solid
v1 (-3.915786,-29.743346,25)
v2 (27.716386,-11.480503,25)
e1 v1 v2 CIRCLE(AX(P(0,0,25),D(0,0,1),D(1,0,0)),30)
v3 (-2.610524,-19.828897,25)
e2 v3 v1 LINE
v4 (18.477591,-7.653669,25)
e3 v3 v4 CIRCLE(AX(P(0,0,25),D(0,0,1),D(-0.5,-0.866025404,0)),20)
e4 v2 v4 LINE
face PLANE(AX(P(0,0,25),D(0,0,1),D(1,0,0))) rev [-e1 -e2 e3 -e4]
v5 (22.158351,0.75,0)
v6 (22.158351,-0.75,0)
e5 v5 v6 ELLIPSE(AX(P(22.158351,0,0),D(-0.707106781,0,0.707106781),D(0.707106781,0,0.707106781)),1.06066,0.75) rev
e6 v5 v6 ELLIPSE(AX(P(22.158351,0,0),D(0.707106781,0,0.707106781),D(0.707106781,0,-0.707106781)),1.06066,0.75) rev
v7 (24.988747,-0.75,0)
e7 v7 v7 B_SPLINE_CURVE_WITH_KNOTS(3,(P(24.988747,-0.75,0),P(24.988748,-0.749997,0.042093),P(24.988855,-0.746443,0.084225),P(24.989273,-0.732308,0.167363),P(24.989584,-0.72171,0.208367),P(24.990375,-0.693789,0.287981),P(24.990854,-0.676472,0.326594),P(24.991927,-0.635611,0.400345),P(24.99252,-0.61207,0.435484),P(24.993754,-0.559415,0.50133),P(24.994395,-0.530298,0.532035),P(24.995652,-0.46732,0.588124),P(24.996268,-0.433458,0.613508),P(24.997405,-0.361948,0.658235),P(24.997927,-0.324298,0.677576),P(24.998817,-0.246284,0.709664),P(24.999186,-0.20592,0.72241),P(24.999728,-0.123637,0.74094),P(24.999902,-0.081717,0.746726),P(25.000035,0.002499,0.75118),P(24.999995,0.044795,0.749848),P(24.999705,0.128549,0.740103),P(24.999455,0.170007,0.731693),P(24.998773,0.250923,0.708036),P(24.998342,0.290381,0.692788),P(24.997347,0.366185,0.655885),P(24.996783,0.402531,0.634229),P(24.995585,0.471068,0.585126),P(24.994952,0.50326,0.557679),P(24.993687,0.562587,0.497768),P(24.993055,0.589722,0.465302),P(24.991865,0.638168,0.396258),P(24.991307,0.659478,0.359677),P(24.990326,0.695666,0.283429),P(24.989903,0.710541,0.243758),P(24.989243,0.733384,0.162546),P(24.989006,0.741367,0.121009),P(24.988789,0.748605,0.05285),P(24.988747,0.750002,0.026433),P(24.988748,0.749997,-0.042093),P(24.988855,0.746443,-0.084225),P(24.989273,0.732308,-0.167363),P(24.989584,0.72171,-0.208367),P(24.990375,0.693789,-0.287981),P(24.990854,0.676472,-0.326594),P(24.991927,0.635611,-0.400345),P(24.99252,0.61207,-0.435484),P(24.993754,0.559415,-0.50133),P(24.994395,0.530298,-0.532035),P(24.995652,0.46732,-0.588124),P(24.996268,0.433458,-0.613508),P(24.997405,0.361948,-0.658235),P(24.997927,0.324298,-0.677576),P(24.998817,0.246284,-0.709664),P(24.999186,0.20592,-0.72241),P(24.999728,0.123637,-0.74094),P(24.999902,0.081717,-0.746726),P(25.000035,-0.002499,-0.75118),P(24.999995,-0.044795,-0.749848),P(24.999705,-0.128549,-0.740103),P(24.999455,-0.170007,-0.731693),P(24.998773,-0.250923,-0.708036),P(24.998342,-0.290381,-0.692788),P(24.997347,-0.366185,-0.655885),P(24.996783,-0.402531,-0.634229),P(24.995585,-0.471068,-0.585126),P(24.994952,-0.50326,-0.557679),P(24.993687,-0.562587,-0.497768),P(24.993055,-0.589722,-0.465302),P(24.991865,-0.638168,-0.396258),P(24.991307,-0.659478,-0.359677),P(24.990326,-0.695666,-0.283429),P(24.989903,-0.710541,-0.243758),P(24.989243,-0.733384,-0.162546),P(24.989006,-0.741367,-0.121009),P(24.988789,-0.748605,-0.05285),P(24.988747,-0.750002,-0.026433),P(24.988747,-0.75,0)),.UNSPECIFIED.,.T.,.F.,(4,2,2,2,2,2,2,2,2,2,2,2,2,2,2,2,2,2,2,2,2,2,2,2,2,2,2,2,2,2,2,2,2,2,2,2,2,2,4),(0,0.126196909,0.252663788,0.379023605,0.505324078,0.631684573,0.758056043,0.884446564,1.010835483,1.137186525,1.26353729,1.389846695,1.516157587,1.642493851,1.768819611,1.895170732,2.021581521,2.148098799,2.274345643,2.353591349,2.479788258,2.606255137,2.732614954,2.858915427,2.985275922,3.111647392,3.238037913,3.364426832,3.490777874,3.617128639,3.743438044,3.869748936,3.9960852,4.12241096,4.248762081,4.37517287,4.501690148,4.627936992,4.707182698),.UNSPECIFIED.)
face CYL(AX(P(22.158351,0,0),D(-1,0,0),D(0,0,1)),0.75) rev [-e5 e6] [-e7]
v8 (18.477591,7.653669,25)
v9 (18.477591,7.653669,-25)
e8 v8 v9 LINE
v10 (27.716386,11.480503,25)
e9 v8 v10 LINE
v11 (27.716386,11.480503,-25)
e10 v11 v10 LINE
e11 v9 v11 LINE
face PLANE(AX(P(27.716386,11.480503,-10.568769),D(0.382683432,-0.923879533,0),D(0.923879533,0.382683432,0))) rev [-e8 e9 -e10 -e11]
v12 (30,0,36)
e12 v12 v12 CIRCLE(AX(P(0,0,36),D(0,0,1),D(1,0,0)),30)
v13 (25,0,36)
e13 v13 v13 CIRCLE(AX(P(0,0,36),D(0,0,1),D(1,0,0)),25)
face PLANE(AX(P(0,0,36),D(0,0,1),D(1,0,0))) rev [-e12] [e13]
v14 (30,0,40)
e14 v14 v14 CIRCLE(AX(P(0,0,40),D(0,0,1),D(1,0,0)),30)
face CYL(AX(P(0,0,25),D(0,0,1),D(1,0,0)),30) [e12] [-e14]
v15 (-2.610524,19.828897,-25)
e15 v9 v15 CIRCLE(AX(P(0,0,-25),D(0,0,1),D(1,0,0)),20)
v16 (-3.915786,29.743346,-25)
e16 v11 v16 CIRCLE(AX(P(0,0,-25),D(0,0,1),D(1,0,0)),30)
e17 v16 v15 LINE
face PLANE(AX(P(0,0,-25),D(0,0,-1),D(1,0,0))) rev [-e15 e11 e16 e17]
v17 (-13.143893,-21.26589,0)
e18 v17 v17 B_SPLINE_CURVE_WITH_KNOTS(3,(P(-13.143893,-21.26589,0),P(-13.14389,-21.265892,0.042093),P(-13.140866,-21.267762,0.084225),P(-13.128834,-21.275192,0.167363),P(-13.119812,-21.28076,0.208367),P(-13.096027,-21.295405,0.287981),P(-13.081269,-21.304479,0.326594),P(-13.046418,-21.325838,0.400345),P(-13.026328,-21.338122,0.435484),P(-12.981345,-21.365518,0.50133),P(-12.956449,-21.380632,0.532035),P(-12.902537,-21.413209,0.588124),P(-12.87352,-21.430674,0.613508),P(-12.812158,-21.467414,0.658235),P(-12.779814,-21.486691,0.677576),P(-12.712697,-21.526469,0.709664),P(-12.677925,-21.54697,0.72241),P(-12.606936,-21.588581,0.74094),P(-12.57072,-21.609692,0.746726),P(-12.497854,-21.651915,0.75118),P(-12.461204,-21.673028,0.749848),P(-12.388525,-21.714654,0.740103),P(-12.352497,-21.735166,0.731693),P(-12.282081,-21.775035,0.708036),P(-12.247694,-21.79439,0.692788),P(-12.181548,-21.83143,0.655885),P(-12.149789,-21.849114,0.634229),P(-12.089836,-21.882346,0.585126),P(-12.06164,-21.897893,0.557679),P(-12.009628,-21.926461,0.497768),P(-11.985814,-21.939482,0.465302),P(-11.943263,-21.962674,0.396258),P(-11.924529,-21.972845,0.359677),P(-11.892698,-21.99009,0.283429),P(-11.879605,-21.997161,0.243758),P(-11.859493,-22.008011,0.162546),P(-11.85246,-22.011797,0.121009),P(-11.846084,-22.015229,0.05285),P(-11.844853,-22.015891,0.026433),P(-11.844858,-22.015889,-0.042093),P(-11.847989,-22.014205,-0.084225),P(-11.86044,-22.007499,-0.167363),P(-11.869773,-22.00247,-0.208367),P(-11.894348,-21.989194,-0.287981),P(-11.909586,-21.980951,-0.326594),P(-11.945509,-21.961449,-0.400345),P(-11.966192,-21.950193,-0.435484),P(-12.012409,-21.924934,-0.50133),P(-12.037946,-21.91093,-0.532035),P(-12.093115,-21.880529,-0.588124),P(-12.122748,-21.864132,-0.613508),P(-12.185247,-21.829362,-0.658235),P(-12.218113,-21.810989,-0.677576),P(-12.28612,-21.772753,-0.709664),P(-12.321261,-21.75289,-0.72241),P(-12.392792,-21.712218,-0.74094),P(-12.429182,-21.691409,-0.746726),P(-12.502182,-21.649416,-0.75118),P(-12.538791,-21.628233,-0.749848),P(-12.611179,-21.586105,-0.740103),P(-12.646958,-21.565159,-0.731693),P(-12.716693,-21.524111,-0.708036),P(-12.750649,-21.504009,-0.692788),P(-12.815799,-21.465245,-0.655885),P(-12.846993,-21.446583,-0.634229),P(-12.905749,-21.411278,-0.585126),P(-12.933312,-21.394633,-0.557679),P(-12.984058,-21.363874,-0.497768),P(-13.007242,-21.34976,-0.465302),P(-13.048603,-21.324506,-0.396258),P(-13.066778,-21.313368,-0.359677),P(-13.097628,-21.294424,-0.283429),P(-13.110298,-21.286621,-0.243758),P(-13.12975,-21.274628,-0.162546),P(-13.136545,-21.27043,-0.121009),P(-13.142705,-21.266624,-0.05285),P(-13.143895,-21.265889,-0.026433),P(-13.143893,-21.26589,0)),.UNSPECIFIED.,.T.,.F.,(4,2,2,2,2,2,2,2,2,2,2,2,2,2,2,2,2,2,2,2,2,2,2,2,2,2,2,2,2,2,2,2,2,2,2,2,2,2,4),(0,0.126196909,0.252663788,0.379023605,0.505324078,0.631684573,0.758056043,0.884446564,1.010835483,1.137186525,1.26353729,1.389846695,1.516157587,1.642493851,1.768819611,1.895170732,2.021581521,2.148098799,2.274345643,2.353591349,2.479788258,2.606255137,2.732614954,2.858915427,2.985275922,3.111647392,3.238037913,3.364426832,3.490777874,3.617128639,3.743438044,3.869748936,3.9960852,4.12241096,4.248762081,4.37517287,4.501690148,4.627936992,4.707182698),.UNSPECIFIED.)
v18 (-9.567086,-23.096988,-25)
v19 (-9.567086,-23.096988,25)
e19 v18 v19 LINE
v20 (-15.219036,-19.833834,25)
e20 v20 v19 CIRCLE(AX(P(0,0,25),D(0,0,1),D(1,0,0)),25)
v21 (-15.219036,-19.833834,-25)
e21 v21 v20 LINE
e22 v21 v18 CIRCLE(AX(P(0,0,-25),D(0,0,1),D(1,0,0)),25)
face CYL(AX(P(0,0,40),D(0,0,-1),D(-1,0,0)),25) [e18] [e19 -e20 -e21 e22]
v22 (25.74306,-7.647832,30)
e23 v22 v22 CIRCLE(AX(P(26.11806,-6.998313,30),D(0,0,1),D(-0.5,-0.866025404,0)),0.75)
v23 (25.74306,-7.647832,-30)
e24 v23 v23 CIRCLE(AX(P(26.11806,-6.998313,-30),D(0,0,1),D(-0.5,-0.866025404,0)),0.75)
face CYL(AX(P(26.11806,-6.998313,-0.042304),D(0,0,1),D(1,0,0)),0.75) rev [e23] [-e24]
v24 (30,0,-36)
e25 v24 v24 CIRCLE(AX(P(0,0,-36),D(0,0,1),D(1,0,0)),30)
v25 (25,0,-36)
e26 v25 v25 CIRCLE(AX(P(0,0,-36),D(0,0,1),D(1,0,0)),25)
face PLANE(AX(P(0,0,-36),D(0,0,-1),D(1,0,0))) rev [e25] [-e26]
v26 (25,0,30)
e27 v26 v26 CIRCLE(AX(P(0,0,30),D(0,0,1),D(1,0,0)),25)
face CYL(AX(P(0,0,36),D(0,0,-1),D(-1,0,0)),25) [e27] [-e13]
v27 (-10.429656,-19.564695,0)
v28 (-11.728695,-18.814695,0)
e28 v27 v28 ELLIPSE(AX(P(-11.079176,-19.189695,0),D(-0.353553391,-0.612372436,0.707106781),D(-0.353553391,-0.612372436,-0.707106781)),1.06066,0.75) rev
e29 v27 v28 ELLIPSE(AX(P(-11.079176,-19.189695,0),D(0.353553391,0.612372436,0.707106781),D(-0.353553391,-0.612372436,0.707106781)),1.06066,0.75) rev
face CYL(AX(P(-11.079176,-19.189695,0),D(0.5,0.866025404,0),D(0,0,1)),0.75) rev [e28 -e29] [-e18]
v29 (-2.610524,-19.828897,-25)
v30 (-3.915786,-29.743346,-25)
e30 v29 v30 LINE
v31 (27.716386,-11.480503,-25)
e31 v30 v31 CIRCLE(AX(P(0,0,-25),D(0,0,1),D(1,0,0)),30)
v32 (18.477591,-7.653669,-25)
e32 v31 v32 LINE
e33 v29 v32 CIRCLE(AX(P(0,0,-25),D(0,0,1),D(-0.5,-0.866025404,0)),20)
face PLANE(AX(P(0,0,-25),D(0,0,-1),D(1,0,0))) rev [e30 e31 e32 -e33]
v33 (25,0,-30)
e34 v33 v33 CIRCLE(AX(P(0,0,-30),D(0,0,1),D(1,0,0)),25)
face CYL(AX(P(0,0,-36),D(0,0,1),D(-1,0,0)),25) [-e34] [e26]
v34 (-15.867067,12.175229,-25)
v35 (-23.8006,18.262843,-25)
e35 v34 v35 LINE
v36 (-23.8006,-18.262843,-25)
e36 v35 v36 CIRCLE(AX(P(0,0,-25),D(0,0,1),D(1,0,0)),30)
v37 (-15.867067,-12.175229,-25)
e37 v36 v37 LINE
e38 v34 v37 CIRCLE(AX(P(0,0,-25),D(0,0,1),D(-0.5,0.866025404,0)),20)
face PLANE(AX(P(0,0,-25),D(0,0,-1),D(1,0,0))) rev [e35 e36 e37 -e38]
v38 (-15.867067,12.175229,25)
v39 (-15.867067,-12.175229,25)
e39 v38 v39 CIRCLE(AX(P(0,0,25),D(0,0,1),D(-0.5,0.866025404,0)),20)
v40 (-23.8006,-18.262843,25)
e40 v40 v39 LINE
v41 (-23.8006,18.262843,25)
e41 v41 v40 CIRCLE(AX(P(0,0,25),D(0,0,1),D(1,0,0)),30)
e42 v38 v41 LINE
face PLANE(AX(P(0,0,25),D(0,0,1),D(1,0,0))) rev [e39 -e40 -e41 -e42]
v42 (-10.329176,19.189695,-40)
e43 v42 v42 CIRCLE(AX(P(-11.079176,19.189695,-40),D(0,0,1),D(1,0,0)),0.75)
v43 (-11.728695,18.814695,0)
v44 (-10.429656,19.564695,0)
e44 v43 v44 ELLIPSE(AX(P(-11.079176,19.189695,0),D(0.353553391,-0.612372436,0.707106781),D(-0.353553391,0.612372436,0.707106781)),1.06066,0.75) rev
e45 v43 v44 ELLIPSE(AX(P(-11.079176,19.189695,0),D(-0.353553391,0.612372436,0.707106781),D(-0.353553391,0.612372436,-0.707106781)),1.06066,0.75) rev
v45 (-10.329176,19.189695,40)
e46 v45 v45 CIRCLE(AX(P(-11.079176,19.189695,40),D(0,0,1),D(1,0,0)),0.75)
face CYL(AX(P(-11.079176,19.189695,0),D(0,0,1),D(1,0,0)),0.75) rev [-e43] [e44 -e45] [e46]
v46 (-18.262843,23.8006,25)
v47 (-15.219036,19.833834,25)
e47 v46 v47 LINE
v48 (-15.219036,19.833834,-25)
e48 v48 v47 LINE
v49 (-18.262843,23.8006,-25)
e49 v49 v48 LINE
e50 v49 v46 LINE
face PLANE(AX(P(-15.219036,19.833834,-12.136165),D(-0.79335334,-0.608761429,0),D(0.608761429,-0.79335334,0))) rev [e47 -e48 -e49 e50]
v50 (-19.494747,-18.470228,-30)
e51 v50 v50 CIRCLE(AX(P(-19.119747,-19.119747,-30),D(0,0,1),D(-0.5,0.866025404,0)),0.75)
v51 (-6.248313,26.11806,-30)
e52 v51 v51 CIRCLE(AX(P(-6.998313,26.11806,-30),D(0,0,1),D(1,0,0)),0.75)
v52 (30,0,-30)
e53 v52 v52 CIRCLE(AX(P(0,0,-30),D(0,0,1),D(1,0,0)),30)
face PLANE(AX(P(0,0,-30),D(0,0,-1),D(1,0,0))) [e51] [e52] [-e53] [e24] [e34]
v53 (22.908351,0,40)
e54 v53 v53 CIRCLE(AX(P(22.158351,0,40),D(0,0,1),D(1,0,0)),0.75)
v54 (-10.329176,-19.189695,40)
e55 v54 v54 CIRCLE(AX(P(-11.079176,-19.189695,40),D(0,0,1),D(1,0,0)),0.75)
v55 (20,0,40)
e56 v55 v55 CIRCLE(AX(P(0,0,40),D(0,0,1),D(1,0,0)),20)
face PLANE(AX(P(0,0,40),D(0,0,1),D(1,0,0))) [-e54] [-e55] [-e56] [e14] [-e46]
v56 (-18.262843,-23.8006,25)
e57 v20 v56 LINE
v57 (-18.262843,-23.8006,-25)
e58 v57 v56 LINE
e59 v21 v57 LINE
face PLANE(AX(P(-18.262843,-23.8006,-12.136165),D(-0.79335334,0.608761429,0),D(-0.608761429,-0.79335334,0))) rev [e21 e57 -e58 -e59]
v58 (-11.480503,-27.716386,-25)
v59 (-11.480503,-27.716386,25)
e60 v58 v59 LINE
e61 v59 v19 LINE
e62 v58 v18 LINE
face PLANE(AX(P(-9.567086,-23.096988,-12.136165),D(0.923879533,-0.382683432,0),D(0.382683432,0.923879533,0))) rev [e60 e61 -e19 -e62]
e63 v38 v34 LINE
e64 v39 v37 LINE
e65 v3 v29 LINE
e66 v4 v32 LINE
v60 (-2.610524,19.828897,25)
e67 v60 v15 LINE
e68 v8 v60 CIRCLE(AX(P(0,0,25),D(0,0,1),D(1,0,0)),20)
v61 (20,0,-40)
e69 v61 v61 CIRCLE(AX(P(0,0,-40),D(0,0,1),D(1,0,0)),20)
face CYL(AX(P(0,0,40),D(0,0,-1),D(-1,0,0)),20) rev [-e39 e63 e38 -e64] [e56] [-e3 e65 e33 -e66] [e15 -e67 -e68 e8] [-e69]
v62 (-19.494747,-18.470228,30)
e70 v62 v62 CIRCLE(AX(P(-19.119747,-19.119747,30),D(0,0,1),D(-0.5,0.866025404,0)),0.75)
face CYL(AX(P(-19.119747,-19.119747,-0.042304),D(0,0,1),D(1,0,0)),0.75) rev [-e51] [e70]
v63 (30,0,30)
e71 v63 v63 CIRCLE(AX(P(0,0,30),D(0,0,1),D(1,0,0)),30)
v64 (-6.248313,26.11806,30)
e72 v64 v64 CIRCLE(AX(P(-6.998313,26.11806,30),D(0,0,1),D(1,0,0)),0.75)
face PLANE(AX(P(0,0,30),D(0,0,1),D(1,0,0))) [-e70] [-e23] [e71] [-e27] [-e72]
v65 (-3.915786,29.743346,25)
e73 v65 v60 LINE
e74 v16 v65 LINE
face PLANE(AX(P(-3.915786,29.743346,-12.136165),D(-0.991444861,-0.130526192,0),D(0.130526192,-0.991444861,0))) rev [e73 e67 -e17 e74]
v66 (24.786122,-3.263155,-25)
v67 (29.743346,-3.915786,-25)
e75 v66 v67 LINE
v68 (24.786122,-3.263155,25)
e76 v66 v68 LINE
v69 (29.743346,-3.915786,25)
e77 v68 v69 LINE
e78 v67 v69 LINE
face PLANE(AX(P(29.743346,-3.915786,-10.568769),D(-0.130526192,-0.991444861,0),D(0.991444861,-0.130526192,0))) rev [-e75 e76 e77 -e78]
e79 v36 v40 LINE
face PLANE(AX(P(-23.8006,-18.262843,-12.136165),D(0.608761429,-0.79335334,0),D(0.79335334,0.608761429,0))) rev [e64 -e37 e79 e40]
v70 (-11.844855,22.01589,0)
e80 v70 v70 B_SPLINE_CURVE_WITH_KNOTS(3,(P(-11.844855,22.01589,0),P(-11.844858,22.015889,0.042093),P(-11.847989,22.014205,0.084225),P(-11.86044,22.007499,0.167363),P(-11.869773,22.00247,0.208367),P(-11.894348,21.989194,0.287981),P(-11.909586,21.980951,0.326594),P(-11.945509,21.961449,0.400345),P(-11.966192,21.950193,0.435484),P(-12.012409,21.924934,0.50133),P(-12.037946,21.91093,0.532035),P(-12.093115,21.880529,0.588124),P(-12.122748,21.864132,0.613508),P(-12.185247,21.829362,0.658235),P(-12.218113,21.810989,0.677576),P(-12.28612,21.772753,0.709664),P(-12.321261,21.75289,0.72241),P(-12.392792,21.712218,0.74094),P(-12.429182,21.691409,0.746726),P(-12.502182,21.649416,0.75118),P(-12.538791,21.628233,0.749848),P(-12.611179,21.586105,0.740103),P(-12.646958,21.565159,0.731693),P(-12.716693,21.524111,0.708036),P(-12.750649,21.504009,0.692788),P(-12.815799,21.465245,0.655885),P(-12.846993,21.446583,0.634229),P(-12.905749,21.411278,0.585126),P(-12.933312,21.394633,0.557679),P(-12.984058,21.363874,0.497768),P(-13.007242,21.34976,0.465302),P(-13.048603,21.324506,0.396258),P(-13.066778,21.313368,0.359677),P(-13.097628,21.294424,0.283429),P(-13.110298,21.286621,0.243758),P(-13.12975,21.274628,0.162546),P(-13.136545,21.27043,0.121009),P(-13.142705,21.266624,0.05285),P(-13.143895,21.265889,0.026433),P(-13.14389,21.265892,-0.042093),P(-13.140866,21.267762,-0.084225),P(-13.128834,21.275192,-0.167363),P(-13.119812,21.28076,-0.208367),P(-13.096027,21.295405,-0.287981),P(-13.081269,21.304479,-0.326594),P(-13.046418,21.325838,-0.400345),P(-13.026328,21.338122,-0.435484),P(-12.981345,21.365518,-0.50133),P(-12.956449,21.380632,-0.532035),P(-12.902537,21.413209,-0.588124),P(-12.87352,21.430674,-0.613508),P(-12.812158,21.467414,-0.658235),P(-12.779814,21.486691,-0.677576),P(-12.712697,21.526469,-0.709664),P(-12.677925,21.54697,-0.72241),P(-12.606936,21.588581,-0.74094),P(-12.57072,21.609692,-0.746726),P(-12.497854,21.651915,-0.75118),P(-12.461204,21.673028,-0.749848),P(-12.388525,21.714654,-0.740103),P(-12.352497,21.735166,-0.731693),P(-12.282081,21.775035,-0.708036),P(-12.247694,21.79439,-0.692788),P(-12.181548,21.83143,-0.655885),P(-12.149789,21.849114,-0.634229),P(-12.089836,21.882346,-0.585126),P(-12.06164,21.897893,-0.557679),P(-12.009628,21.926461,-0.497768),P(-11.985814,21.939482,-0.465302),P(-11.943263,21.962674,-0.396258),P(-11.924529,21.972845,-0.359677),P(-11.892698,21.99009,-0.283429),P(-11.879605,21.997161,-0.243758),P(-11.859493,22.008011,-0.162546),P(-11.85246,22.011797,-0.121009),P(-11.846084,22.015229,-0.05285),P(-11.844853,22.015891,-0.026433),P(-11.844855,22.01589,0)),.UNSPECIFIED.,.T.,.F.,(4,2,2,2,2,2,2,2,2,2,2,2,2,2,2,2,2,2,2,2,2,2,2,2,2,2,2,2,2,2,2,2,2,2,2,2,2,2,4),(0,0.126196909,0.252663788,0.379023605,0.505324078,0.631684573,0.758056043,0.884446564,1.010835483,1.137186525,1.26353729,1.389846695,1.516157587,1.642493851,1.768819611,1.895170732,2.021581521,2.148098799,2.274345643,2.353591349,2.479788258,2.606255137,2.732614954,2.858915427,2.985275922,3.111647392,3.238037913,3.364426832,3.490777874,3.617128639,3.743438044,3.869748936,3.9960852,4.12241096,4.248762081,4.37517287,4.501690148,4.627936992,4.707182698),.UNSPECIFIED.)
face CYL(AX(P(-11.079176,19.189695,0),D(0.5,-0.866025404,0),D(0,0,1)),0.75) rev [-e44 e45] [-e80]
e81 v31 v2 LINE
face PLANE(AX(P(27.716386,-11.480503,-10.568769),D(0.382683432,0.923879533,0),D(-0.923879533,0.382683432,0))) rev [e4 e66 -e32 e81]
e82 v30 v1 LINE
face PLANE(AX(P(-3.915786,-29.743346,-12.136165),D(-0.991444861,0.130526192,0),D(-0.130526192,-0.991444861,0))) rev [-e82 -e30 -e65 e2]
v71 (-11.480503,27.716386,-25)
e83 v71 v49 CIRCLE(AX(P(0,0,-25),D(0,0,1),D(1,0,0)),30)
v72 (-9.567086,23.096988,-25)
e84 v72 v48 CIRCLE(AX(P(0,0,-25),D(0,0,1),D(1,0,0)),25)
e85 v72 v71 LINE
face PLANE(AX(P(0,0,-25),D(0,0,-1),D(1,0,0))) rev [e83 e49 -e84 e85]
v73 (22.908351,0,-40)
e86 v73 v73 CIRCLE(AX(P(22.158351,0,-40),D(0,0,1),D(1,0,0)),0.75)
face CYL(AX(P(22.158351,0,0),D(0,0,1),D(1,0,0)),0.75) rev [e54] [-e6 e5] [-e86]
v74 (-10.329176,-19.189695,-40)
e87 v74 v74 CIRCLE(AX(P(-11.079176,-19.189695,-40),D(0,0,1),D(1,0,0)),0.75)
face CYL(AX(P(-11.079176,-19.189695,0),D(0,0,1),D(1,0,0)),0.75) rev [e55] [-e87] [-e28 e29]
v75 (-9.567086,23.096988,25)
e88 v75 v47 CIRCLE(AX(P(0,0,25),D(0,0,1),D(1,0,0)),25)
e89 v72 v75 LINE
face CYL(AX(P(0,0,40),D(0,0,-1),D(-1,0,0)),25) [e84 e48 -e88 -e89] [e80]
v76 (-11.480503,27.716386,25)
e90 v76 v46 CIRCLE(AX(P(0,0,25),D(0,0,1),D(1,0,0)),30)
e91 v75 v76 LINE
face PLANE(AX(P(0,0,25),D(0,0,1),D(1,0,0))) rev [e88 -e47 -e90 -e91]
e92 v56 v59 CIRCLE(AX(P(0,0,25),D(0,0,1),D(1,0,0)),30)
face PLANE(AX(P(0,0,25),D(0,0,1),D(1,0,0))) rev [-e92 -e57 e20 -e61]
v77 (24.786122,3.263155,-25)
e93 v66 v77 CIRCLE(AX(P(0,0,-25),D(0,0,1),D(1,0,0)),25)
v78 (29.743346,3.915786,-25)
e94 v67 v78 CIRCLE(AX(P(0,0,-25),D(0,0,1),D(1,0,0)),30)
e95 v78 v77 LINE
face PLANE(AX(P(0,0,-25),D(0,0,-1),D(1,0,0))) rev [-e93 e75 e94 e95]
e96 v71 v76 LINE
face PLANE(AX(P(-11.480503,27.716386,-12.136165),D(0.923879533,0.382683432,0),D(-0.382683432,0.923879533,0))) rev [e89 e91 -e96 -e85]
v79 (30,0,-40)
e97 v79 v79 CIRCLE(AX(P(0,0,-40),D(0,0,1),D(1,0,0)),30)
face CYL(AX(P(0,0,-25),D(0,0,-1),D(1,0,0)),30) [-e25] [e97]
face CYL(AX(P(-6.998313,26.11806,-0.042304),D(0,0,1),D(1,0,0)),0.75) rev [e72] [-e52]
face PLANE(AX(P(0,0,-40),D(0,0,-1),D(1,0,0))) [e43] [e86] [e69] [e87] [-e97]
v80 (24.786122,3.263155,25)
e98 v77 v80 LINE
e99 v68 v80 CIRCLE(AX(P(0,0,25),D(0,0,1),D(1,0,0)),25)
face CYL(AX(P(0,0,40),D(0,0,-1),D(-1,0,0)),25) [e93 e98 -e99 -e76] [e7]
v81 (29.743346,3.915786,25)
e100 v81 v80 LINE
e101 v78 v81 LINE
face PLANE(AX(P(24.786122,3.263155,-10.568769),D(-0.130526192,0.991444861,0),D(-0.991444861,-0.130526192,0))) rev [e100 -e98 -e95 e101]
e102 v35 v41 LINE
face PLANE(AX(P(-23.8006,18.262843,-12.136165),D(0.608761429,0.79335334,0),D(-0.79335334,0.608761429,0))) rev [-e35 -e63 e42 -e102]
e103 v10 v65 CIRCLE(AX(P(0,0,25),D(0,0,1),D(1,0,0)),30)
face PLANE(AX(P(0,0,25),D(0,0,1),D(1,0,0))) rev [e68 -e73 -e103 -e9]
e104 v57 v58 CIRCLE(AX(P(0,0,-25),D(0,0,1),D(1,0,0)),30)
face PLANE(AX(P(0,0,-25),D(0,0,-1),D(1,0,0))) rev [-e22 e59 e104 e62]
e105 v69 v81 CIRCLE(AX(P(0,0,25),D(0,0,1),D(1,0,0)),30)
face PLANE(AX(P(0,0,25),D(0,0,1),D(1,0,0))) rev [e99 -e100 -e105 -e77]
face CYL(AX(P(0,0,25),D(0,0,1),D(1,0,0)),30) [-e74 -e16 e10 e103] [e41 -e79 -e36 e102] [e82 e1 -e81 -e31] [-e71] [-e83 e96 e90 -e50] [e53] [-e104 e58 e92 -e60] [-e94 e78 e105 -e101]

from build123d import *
from build123d.topology import SkipClean

# Parameters (mm, degrees)
SKETCH_1_R               = 25
SKETCH_1_R_2             = 20
EXTRUDE_1_DEPTH          = 40
EXTRUDE_START            = -15
SKETCH_2_R               = 30
SKETCH_2_R_2             = 25
EXTRUDE_2_DEPTH          = 15
EXTRUDE_START_2          = 25
EXTRUDE_3_DEPTH          = 25
PATTERN_CIRCULAR_1_COUNT = 3
CUT_EXTRUDE_1_DEPTH      = 25
PATTERN_CIRCULAR_2_COUNT = 3
SKETCH_6_R               = 0.75
CUT_EXTRUDE_2_DEPTH      = 40
PATTERN_CIRCULAR_4_COUNT = 3
CUT_EXTRUDE_3_DEPTH      = 3
CUT_EXTRUDE_3_DEPTH_BACK = 3
SKETCH_11_R              = 30
SKETCH_11_R_2            = 25
SKETCH_13_R              = 0.75
CUT_EXTRUDE_5_DEPTH      = 52.961524285
PATTERN_CIRCULAR_3_COUNT = 3


with BuildPart() as part:
    # 草图1 → 凸台-拉伸1 (new body)
    with BuildSketch(Plane.XY):
        Circle(SKETCH_1_R)
        Circle(SKETCH_1_R_2, mode=Mode.SUBTRACT)
    extrude(amount=EXTRUDE_1_DEPTH)

    # 草图2 → 凸台-拉伸2 (add)
    with BuildSketch(Plane.XY.offset(40).offset(EXTRUDE_START)):
        Circle(SKETCH_2_R)
        Circle(SKETCH_2_R_2, mode=Mode.SUBTRACT)
    extrude(amount=EXTRUDE_2_DEPTH)

    # 草图3 → 凸台-拉伸3 (add)
    with BuildSketch(Plane(origin=(0, 0, 25), x_dir=(-1, 0, 0), z_dir=(0, 0, -1)).offset(EXTRUDE_START_2)):
        with BuildLine():
            Line((-24.786121534, 3.263154806), (-29.743345841, 3.915785767))
            ThreePointArc((-29.743345841, 3.915785767), (-28.977774789, 7.764571353), (-27.716385975, 11.480502971))
            Line((-27.716385975, 11.480502971), (-23.096988313, 9.567085809))
            ThreePointArc((-23.096988313, 9.567085809), (-24.148145657, 6.470476128), (-24.786121534, 3.263154806))
        make_face()
        with BuildLine():
            Line((-29.743345841, -3.915785767), (-24.786121534, -3.263154806))
            ThreePointArc((-24.786121534, -3.263154806), (-24.148145657, -6.470476128), (-23.096988313, -9.567085809))
            Line((-23.096988313, -9.567085809), (-27.716385975, -11.480502971))
            ThreePointArc((-27.716385975, -11.480502971), (-28.977774789, -7.764571353), (-29.743345841, -3.915785767))
        make_face()
    extrude_3 = extrude(amount=-EXTRUDE_3_DEPTH)

    # 阵列(圆周)1: 凸台-拉伸3 ×3 about axis
    pattern_circular_1_axis = Axis((0, 0, 0), (0, 0, 1))
    for i in range(1, PATTERN_CIRCULAR_1_COUNT):
        add(extrude_3.rotate(pattern_circular_1_axis, i * 360 / PATTERN_CIRCULAR_1_COUNT))

    # 草图5 → 切除-拉伸1 (cut)
    with BuildSketch(Plane(origin=(0, 0, 0), x_dir=(-1, 0, 0), z_dir=(0, 0, -1))):
        with BuildLine():
            Line((-23.096988313, 9.567085809), (-18.47759065, 7.653668647))
            ThreePointArc((-18.47759065, 7.653668647), (-10, 17.320508076), (2.610523844, 19.828897227))
            Line((2.610523844, 19.828897227), (3.263154806, 24.786121534))
            ThreePointArc((3.263154806, 24.786121534), (-12.5, 21.650635095), (-23.096988313, 9.567085809))
        make_face()
    cut_extrude_1 = extrude(amount=-CUT_EXTRUDE_1_DEPTH, mode=Mode.SUBTRACT)

    # 阵列(圆周)2: 切除-拉伸1 ×3 about axis
    pattern_circular_2_axis = Axis((0, 0, 40), (0, 0, -1))
    for i in range(1, PATTERN_CIRCULAR_2_COUNT):
        add(cut_extrude_1.rotate(pattern_circular_2_axis, i * 360 / PATTERN_CIRCULAR_2_COUNT), mode=Mode.SUBTRACT)

    # 草图6 → 切除-拉伸2 (cut)
    with BuildSketch(Plane.XY.offset(40)):
        with Locations((-11.079175501, 19.189694874)):
            Circle(SKETCH_6_R)
        with Locations((22.158351002, 0)):
            Circle(SKETCH_6_R)
        with Locations((-11.079175501, -19.189694874)):
            Circle(SKETCH_6_R)
    extrude(amount=-CUT_EXTRUDE_2_DEPTH, mode=Mode.SUBTRACT)

    # 草图10 → 切除-旋转3 (revolve, cut)
    with SkipClean():  # the faces are left unmerged after this step: merging them gives an invalid solid
        with BuildSketch(Plane(origin=(0, 0, 0), x_dir=(-1, 0, 0), z_dir=(0, 0, -1))):
            with BuildLine():
                ThreePointArc((-22.908351002, 0), (-22.688681088, 0.530330086), (-22.158351002, 0.75))
                Line((-22.158351002, 0.75), (-24.988747468, 0.75))
                ThreePointArc((-24.988747468, 0.75), (-24.997186709, 0.375042204), (-25, 0))
                Line((-25, 0), (-22.908351002, 0))
            make_face()
            with BuildLine():
                Line((-22.158351002, 0), (-22.158351002, 0.75))
                ThreePointArc((-22.158351002, 0.75), (-22.688681088, 0.530330086), (-22.908351002, 0))
                Line((-22.908351002, 0), (-22.158351002, 0))
            make_face()
            with BuildLine():
                Line((-22.158351002, -0.75), (-22.158351002, 0))
                Line((-22.158351002, 0), (-22.908351002, 0))
                ThreePointArc((-22.908351002, 0), (-22.688681088, -0.530330086), (-22.158351002, -0.75))
            make_face()
            with BuildLine():
                ThreePointArc((-25, 0), (-24.997186709, 0.375042204), (-24.988747468, 0.75))
                Line((-24.988747468, 0.75), (-26.146421449, 0.75))
                Line((-26.146421449, 0.75), (-26.146421449, 0))
                Line((-26.146421449, 0), (-25, 0))
            make_face()
        cut_revolve_3 = revolve(axis=Axis((22.158351002, 0, 0), (1, 0, 0)), mode=Mode.SUBTRACT)
    add(part.part.scale(1), mode=Mode.REPLACE)  # the faces are merged on a copy

    # 阵列(圆周)4: 切除-旋转3 ×3 about axis
    pattern_circular_4_axis = Axis((0, 0, 40), (0, 0, -1))
    for i in range(1, PATTERN_CIRCULAR_4_COUNT):
        add(cut_revolve_3.rotate(pattern_circular_4_axis, i * 360 / PATTERN_CIRCULAR_4_COUNT), mode=Mode.SUBTRACT)

    # 草图11 → 切除-拉伸3 (cut, two sides: drawn at the far end of the back side and taken through both)
    with BuildSketch(Plane.XY.offset(33).offset(-CUT_EXTRUDE_3_DEPTH_BACK)):
        Circle(SKETCH_11_R)
        Circle(SKETCH_11_R_2, mode=Mode.SUBTRACT)
    extrude(amount=CUT_EXTRUDE_3_DEPTH + CUT_EXTRUDE_3_DEPTH_BACK, mode=Mode.SUBTRACT)

    # 草图13 → 切除-拉伸5 (cut, through all)
    with BuildSketch(Plane.XY.offset(30)):
        with Locations((-6.998313063, 26.118059917)):
            Circle(SKETCH_13_R)
    cut_extrude_5 = extrude(amount=-CUT_EXTRUDE_5_DEPTH, mode=Mode.SUBTRACT)

    # 阵列(圆周)3: 切除-拉伸5 ×3 about axis
    pattern_circular_3_axis = Axis((0, 0, 0), (0, 0, 1))
    for i in range(1, PATTERN_CIRCULAR_3_COUNT):
        add(cut_extrude_5.rotate(pattern_circular_3_axis, i * 360 / PATTERN_CIRCULAR_3_COUNT), mode=Mode.SUBTRACT)

    # 镜向1: part across face


with BuildPart() as part_1:
    add(part.part)
    add(part.part.mirror(Plane(origin=(-11.959573357, -20.875780488, 0), x_dir=(1, 0, 0), z_dir=(0, 0, -1))))


solid = part_1.part
